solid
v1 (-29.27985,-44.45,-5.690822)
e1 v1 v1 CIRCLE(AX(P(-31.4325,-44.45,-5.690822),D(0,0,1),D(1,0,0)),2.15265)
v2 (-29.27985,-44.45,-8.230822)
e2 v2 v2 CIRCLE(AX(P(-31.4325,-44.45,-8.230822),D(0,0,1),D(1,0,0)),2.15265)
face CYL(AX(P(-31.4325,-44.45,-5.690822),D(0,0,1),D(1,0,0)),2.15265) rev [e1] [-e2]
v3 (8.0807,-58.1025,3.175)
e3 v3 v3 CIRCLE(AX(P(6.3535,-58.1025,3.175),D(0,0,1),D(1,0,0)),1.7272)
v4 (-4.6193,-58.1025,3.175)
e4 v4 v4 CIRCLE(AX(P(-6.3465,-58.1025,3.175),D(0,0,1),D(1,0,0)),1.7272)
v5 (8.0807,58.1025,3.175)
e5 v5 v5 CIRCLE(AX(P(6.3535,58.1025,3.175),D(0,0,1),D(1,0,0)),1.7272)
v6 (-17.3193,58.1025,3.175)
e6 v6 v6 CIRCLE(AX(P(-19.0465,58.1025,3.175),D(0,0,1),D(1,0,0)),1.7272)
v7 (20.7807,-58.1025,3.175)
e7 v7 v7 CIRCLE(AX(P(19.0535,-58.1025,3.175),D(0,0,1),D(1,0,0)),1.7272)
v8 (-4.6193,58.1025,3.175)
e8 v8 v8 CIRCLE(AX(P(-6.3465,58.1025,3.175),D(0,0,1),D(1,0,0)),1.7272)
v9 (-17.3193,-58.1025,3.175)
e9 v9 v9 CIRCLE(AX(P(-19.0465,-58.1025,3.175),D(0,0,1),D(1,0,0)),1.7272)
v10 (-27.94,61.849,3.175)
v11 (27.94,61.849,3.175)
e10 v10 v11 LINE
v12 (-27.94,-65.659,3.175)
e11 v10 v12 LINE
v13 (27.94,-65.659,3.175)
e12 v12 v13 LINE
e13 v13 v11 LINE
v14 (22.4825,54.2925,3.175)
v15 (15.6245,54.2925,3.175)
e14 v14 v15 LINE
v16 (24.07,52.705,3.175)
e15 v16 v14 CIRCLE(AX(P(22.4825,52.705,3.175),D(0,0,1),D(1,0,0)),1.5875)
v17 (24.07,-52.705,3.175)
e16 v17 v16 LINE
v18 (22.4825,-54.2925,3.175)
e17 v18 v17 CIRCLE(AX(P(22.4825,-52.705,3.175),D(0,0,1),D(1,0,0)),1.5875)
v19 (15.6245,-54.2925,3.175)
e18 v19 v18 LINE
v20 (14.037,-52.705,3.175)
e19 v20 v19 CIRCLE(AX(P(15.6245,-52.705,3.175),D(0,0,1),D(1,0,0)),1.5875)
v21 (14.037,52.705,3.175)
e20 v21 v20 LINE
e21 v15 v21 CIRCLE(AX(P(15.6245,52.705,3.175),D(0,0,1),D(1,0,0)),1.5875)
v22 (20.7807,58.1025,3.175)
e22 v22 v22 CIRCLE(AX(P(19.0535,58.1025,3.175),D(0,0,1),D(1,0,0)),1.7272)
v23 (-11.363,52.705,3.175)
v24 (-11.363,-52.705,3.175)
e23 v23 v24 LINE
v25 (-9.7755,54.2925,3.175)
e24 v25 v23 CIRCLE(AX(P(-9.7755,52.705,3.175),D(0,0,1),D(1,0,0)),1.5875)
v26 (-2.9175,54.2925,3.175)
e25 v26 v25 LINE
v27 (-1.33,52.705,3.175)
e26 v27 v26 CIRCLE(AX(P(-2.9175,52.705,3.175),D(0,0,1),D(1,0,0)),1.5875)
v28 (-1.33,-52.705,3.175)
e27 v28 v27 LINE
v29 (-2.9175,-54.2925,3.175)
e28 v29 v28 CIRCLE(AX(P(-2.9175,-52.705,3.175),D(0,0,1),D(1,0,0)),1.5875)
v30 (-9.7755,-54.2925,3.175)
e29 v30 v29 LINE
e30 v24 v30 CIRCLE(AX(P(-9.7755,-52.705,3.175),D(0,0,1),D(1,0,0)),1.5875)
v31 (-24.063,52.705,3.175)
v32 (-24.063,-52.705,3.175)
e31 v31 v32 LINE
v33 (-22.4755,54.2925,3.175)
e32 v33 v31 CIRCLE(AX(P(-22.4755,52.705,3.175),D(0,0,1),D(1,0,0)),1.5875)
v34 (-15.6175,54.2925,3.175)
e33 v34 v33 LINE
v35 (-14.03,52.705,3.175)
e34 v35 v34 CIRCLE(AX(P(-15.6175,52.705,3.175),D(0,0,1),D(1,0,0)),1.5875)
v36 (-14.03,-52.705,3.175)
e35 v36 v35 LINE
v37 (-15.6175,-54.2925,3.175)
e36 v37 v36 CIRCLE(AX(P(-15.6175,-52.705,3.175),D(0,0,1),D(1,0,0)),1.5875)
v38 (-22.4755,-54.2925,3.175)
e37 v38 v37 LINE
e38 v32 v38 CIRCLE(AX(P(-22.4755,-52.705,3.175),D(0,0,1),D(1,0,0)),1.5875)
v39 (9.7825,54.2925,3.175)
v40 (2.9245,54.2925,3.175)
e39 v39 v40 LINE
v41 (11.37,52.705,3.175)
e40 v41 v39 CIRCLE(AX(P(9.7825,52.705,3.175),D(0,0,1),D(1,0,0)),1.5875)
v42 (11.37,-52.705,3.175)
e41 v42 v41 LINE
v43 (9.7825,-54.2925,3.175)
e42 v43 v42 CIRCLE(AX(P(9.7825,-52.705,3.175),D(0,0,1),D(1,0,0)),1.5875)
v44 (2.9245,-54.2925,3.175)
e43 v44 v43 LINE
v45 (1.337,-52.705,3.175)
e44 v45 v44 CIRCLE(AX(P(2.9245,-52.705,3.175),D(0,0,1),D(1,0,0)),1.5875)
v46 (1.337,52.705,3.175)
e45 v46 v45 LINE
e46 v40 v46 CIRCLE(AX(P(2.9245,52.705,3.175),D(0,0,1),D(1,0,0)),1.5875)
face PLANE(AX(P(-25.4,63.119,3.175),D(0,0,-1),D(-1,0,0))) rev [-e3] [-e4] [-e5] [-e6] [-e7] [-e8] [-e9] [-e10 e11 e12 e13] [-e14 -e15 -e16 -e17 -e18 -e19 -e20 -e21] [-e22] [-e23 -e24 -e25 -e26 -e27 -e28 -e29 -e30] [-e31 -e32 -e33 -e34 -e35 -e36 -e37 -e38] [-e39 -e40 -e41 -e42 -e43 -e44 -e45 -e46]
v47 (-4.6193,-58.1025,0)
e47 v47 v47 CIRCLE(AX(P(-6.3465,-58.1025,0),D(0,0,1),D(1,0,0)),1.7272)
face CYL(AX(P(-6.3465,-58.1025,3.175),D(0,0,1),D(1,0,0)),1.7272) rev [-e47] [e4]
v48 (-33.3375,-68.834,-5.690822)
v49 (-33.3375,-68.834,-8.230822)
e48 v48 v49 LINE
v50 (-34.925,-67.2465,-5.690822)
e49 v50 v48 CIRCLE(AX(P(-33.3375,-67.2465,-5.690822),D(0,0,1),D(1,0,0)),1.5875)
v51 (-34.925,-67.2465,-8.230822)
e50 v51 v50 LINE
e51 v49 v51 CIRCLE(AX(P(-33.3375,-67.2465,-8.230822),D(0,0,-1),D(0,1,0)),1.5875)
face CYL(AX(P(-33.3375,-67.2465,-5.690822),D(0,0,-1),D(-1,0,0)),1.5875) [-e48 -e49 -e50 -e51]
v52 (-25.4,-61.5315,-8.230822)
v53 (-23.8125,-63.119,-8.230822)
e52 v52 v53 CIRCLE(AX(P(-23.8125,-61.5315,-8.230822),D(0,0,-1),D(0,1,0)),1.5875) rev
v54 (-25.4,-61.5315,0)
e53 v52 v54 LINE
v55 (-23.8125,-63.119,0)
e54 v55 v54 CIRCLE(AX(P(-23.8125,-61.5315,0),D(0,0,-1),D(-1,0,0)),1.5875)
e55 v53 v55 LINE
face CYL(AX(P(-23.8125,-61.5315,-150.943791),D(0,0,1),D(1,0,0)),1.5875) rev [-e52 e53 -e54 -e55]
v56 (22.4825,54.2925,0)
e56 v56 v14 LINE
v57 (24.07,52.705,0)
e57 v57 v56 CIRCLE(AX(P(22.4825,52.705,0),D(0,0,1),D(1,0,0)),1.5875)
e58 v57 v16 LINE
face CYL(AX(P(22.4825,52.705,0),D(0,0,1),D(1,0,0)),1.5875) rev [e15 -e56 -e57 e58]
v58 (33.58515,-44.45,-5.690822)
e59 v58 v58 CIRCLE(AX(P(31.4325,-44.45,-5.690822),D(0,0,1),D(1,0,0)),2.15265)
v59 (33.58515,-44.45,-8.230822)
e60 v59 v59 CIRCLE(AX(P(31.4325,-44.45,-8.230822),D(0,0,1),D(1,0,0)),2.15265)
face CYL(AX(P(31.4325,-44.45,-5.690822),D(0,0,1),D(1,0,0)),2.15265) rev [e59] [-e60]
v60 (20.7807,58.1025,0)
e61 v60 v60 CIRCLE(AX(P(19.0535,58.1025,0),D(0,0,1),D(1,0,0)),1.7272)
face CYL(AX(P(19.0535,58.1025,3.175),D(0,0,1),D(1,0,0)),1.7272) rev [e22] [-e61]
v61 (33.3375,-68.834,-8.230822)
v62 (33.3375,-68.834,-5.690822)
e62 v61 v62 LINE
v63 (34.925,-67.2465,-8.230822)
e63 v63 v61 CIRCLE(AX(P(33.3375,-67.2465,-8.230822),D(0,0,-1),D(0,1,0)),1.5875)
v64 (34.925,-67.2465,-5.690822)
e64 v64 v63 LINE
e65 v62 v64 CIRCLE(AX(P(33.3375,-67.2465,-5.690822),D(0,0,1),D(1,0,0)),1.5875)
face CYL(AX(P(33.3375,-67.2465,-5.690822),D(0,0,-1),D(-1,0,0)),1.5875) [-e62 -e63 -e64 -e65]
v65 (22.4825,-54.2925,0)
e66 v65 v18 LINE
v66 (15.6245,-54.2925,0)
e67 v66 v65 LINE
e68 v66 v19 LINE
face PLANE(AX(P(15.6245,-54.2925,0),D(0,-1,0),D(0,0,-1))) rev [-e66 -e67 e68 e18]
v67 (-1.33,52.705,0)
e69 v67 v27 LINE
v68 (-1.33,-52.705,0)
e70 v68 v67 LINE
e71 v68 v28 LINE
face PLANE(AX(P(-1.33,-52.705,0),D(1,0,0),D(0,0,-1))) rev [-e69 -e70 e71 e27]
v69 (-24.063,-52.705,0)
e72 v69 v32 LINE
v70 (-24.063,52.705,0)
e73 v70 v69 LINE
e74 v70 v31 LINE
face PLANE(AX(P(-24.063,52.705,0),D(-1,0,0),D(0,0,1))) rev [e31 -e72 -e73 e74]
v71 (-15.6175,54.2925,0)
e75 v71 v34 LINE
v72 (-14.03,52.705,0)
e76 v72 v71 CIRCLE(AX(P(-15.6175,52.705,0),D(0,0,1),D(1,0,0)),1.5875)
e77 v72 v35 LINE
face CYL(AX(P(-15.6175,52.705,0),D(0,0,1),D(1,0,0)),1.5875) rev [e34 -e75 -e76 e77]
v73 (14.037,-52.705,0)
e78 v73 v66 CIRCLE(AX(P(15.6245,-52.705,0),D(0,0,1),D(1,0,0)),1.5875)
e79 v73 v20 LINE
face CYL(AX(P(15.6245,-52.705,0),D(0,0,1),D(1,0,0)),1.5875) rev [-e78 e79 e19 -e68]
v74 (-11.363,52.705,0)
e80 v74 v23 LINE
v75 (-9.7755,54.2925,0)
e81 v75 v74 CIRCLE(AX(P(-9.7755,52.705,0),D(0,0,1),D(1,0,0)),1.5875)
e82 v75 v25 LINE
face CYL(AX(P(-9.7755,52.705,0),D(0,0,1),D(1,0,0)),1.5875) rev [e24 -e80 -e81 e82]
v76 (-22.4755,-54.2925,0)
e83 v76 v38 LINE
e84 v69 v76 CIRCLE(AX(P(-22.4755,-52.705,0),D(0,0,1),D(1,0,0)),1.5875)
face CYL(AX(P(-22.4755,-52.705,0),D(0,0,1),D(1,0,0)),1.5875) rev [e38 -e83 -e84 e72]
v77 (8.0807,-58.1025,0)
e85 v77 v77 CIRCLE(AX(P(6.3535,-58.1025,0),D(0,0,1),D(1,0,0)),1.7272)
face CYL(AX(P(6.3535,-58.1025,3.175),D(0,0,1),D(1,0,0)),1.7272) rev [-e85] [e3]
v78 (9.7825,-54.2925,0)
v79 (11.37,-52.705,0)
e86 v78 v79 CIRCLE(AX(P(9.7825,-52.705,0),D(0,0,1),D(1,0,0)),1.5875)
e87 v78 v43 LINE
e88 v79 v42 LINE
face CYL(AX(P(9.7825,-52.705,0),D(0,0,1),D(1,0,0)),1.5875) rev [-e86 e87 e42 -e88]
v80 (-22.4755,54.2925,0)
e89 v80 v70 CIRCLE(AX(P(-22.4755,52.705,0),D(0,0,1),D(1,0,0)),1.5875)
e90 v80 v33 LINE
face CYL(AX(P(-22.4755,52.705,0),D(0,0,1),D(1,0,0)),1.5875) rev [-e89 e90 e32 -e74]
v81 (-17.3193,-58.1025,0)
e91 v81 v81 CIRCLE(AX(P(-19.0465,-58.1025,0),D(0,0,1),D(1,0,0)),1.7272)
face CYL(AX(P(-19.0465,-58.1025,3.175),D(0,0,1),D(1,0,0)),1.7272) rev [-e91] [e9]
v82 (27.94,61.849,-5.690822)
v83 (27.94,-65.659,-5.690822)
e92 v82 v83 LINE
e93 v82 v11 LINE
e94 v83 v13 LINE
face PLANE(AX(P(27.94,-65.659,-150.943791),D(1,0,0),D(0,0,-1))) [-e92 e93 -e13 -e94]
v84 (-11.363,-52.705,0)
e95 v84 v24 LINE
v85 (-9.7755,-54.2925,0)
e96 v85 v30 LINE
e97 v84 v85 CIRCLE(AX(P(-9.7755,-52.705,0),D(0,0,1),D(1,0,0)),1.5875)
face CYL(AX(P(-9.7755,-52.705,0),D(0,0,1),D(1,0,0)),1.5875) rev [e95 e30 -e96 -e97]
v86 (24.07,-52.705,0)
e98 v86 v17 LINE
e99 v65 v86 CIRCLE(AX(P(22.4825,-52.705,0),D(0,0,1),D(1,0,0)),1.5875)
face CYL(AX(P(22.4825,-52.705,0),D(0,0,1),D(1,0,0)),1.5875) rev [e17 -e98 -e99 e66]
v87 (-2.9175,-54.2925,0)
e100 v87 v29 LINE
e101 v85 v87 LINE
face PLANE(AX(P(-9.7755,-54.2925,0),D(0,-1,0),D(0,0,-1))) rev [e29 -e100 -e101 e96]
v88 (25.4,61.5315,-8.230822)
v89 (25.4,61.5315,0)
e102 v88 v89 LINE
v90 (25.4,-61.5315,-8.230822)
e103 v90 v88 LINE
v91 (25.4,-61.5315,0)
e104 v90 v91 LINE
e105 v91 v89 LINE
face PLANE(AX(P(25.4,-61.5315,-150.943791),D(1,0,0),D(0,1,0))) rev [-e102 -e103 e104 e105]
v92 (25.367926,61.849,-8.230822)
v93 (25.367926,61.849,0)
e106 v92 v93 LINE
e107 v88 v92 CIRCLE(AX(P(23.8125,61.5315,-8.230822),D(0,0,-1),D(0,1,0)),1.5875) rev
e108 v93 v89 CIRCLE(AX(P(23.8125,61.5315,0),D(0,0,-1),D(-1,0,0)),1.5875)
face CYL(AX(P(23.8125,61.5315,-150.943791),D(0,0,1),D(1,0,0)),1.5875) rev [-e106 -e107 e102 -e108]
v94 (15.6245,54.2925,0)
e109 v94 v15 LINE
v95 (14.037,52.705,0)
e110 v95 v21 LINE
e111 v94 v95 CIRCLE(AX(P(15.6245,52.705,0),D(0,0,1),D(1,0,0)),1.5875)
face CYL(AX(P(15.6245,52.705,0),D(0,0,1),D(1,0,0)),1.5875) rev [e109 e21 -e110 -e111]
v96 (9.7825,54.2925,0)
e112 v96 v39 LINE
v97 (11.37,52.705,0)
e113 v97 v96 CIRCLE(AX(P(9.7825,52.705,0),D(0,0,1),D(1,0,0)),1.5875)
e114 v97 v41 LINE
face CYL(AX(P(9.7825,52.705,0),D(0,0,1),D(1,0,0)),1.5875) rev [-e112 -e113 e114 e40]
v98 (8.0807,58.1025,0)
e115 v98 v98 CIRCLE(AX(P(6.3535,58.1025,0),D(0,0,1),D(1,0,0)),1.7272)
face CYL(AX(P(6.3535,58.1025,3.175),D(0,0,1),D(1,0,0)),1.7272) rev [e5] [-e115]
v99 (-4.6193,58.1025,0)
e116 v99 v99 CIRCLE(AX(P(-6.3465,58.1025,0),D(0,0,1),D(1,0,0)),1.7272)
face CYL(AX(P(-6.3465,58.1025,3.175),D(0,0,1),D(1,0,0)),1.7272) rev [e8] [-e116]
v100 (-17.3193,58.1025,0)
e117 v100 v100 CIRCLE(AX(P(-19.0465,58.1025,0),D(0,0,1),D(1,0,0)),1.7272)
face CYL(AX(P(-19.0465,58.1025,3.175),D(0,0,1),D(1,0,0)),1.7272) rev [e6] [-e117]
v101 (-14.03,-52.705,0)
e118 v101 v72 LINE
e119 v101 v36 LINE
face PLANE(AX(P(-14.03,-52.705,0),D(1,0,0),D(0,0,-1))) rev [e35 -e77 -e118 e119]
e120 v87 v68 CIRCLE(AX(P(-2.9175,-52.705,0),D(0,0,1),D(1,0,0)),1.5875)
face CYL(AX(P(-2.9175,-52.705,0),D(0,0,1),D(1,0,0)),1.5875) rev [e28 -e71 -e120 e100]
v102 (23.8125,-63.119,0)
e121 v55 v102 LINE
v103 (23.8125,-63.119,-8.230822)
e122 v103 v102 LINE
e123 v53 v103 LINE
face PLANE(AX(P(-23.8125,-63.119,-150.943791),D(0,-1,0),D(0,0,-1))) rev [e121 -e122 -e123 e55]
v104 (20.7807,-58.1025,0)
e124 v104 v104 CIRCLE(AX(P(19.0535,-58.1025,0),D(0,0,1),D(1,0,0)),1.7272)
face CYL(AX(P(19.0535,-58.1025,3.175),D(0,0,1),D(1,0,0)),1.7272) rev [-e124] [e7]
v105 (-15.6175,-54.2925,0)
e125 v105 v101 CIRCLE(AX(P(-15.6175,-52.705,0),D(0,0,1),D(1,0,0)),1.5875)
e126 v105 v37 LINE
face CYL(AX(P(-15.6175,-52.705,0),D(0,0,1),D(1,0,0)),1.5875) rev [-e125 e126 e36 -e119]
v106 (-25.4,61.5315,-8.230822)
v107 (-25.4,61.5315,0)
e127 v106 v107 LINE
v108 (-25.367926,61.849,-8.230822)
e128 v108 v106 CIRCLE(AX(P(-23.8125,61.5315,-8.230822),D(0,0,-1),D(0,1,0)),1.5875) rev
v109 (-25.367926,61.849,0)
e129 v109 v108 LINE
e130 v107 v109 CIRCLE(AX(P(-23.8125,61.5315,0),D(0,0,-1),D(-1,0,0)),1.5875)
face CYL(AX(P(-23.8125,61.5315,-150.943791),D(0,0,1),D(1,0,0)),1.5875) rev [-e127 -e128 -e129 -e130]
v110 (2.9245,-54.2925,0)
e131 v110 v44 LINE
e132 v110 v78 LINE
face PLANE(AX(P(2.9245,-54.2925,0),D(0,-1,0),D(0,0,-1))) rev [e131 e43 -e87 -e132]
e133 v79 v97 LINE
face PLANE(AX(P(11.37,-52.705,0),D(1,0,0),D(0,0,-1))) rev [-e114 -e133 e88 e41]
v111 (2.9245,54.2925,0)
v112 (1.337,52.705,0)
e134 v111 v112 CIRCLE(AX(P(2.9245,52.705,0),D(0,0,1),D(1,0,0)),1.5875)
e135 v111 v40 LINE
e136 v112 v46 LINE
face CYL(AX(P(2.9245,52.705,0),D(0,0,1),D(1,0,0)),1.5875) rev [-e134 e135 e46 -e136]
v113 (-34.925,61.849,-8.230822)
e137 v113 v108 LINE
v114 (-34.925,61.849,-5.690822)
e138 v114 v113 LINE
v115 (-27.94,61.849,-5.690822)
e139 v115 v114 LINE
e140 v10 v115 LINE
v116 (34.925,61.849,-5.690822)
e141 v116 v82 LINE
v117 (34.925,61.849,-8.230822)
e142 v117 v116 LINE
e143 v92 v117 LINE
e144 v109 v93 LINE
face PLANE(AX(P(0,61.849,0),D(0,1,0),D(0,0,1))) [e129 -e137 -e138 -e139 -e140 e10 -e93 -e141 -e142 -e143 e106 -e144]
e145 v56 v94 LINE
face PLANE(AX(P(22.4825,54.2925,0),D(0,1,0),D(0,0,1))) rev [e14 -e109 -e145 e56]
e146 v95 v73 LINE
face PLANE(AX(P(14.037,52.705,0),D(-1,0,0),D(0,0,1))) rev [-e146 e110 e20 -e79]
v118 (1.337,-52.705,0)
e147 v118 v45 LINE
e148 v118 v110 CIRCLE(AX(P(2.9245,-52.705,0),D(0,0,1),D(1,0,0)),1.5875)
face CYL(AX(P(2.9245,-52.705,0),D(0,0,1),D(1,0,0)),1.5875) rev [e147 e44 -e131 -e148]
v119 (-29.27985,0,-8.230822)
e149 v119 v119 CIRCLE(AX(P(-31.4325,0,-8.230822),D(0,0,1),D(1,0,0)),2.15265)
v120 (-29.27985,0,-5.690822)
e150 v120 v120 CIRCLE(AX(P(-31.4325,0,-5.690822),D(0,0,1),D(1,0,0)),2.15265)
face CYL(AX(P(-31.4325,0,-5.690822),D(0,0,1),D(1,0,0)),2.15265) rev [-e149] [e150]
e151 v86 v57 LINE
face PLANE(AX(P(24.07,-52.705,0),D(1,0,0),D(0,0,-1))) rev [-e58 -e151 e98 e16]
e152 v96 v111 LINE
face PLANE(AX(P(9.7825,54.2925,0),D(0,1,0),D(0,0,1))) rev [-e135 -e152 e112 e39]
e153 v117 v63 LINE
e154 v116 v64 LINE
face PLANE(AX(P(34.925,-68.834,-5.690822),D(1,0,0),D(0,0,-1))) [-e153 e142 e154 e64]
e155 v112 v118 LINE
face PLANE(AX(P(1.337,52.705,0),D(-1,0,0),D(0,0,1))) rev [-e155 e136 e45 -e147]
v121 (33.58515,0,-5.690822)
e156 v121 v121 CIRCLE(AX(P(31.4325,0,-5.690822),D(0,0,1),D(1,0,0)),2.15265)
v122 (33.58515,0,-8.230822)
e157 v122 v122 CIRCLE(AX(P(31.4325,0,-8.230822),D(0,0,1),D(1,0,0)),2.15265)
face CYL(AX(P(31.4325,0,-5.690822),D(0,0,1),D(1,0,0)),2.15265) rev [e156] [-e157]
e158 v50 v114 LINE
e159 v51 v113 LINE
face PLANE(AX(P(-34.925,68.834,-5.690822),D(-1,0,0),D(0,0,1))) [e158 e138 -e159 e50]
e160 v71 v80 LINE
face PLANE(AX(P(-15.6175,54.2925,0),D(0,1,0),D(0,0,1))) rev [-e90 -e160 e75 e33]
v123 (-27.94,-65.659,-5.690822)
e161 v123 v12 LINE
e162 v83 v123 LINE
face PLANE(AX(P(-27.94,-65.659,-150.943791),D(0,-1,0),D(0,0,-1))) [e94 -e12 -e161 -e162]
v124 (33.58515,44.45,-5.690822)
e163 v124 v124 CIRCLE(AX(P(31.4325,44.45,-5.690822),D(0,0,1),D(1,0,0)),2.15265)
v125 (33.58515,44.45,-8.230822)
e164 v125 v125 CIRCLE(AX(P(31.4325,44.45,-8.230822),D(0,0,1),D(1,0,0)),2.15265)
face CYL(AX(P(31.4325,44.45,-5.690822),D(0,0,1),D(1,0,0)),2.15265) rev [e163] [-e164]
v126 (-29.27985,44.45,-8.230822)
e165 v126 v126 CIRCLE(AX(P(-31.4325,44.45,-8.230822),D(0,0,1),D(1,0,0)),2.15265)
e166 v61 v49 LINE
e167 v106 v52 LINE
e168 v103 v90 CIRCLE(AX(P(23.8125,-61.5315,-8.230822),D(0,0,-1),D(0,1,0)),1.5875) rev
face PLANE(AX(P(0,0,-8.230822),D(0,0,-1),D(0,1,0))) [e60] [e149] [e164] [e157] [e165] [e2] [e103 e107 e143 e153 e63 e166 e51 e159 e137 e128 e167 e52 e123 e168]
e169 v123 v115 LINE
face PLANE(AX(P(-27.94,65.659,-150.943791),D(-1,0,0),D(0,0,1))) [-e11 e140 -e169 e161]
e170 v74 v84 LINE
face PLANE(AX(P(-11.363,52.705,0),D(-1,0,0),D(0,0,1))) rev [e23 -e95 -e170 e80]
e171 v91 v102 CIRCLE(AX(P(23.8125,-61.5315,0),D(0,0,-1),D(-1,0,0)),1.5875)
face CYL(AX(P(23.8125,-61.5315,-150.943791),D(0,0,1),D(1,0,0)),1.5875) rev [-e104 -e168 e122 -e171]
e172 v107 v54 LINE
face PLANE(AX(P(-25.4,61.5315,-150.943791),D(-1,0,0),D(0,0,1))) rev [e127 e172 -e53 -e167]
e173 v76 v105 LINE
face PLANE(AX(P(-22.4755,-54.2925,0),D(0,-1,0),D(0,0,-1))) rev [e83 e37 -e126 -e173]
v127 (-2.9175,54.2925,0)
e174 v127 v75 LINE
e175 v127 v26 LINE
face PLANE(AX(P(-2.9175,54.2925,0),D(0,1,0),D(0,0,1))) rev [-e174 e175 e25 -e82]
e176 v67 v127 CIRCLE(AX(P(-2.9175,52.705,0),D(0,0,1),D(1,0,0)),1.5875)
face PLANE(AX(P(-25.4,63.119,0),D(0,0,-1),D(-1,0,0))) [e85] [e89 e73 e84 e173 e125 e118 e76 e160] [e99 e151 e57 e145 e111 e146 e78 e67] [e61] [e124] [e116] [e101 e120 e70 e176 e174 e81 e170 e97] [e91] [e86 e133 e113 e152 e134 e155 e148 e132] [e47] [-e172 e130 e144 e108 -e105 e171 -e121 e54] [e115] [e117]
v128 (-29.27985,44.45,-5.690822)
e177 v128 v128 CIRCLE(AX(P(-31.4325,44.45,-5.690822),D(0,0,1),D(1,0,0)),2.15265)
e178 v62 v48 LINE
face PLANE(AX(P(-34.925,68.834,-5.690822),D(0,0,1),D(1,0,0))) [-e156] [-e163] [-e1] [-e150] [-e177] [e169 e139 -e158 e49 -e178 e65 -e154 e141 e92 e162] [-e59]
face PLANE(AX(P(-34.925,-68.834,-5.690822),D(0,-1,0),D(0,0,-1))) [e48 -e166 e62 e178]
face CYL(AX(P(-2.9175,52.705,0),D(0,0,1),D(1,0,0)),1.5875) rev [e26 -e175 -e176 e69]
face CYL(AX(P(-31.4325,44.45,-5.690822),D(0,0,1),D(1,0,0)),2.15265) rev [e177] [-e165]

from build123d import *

# Parameters (mm, degrees)
SKETCH1_W                 = 50.8
SKETCH1_H                 = 126.238
BACK_DEPTH                = 3.175
CUT_EXTRUDE3_DEPTH        = 69.11203114
F_4_CLEARANCE_HOLE1_D     = 3.4544
LPATTERN1_OUTLINE_R       = 1.7272
LPATTERN1_DEPTH           = 3.175
SKETCH9_W                 = 55.88
SKETCH9_H                 = 131.318
WALLS_DEPTH               = 11.405821857
SKETCH11_W                = 69.85
SKETCH11_H                = 137.668
SKETCH11_W_2              = 50.8
SKETCH11_H_2              = 126.238
LIP_DEPTH                 = 2.54
F_6_CLEARANCE_OVERSIZED_D = 4.3053
FILLET2_R                 = 1.5875
CUT_EXTRUDE4_DEPTH        = 6.858
CUT_EXTRUDE4_DEPTH_BACK   = 3.81
SKETCH19_W                = 76.814856898
SKETCH19_H                = 21.095936882


# Read off the part's stored shape, not the designer's step: LPattern1
with BuildPart() as part:
    # Sketch1 → back (new body)
    with BuildSketch(Plane.XY):
        Rectangle(SKETCH1_W, SKETCH1_H)
    extrude(amount=BACK_DEPTH)

    # Sketch6 → Cut-Extrude3 (cut, through all)
    with BuildSketch(Plane.XY.offset(3.175)):
        with BuildLine():
            Line((24.07, -52.705), (24.07, 52.705))
            ThreePointArc((24.07, 52.705), (23.605032015, 53.827532015), (22.4825, 54.2925))
            Line((22.4825, 54.2925), (15.6245, 54.2925))
            ThreePointArc((15.6245, 54.2925), (14.501967985, 53.827532015), (14.037, 52.705))
            Line((14.037, 52.705), (14.037, -52.705))
            ThreePointArc((14.037, -52.705), (14.501967985, -53.827532015), (15.6245, -54.2925))
            Line((15.6245, -54.2925), (22.4825, -54.2925))
            ThreePointArc((22.4825, -54.2925), (23.605032015, -53.827532015), (24.07, -52.705))
        make_face()
    extrude(amount=-CUT_EXTRUDE3_DEPTH, mode=Mode.SUBTRACT)

    # #4 Clearance Hole1 (through all)
    with Locations(Plane(origin=(19.0535, 58.1025, 3.175), x_dir=(1, 0, 0), z_dir=(0, 0, 1))):
        with Locations((0, 0), (0, -116.205)):
            Hole(F_4_CLEARANCE_HOLE1_D / 2)

    # LPattern1 outline → LPattern1 (cut)
    with BuildSketch(Plane.XY):
        with BuildLine():
            ThreePointArc((1.337, -52.705), (1.801967985, -53.827532015), (2.9245, -54.2925))
            Line((2.9245, -54.2925), (9.7825, -54.2925))
            ThreePointArc((9.7825, -54.2925), (10.905032015, -53.827532015), (11.37, -52.705))
            Line((11.37, -52.705), (11.37, 52.705))
            ThreePointArc((11.37, 52.705), (10.905032015, 53.827532015), (9.7825, 54.2925))
            Line((9.7825, 54.2925), (2.9245, 54.2925))
            ThreePointArc((2.9245, 54.2925), (1.801967985, 53.827532015), (1.337, 52.705))
            Line((1.337, 52.705), (1.337, -52.705))
        make_face()
        with BuildLine():
            ThreePointArc((-11.363, -52.705), (-10.898032015, -53.827532015), (-9.7755, -54.2925))
            Line((-9.7755, -54.2925), (-2.9175, -54.2925))
            ThreePointArc((-2.9175, -54.2925), (-1.794967985, -53.827532015), (-1.33, -52.705))
            Line((-1.33, -52.705), (-1.33, 52.705))
            ThreePointArc((-1.33, 52.705), (-1.794967985, 53.827532015), (-2.9175, 54.2925))
            Line((-2.9175, 54.2925), (-9.7755, 54.2925))
            ThreePointArc((-9.7755, 54.2925), (-10.898032015, 53.827532015), (-11.363, 52.705))
            Line((-11.363, 52.705), (-11.363, -52.705))
        make_face()
        with BuildLine():
            ThreePointArc((-24.063, -52.705), (-23.598032015, -53.827532015), (-22.4755, -54.2925))
            Line((-22.4755, -54.2925), (-15.6175, -54.2925))
            ThreePointArc((-15.6175, -54.2925), (-14.494967985, -53.827532015), (-14.03, -52.705))
            Line((-14.03, -52.705), (-14.03, 52.705))
            ThreePointArc((-14.03, 52.705), (-14.494967985, 53.827532015), (-15.6175, 54.2925))
            Line((-15.6175, 54.2925), (-22.4755, 54.2925))
            ThreePointArc((-22.4755, 54.2925), (-23.598032015, 53.827532015), (-24.063, 52.705))
            Line((-24.063, 52.705), (-24.063, -52.705))
        make_face()
        with Locations((6.3535, -58.1025)):
            Circle(LPATTERN1_OUTLINE_R)
        with Locations((-6.3465, -58.1025)):
            Circle(LPATTERN1_OUTLINE_R)
        with Locations((-19.0465, -58.1025)):
            Circle(LPATTERN1_OUTLINE_R)
        with Locations((6.3535, 58.1025)):
            Circle(LPATTERN1_OUTLINE_R)
        with Locations((-6.3465, 58.1025)):
            Circle(LPATTERN1_OUTLINE_R)
        with Locations((-19.0465, 58.1025)):
            Circle(LPATTERN1_OUTLINE_R)
    extrude(amount=LPATTERN1_DEPTH, mode=Mode.SUBTRACT)

    # Sketch9 → walls (add)
    with BuildSketch(Plane.XY.offset(3.175)):
        Rectangle(SKETCH9_W, SKETCH9_H)
        with BuildLine():
            Line((25.4, -61.5315), (25.4, 61.5315))
            ThreePointArc((25.4, 61.5315), (24.935032015, 62.654032015), (23.8125, 63.119))
            Line((23.8125, 63.119), (-23.8125, 63.119))
            ThreePointArc((-23.8125, 63.119), (-24.935032015, 62.654032015), (-25.4, 61.5315))
            Line((-25.4, 61.5315), (-25.4, -61.5315))
            ThreePointArc((-25.4, -61.5315), (-24.935032015, -62.654032015), (-23.8125, -63.119))
            Line((-23.8125, -63.119), (23.8125, -63.119))
            ThreePointArc((23.8125, -63.119), (24.935032015, -62.654032015), (25.4, -61.5315))
        make_face(mode=Mode.SUBTRACT)
    extrude(amount=-WALLS_DEPTH)

    # Sketch11 → lip (add)
    with BuildSketch(Plane(origin=(0, 0, -8.230821857), x_dir=(-1, 0, 0), z_dir=(0, 0, -1))):
        Rectangle(SKETCH11_W, SKETCH11_H)
        Rectangle(SKETCH11_W_2, SKETCH11_H_2, mode=Mode.SUBTRACT)
    extrude(amount=-LIP_DEPTH)

    # #6 Clearance OVERSIZED (through all)
    with Locations(Plane(origin=(-31.4325, 44.45, -5.690821857), x_dir=(1, 0, 0), z_dir=(0, 0, 1))):
        with Locations((0, 0), (0, -44.45), (0, -88.9)):
            f_6_clearance_oversized = Hole(F_6_CLEARANCE_OVERSIZED_D / 2)

    # Fillet2
    fillet2_edges = [part.edges().sort_by_distance(p)[0] for p in [
        (34.925, 68.834, -6.960821857),
        (-34.925, 68.834, -6.960821857),
        (-34.925, -68.834, -6.960821857),
        (34.925, -68.834, -6.960821857),
    ]]
    fillet(fillet2_edges, radius=FILLET2_R)

    # Mirror2: #6 Clearance OVERSIZED across plane
    add(f_6_clearance_oversized.mirror(Plane(origin=(0, 0, 0), x_dir=(0, 0, 1), z_dir=(1, 0, 0))), mode=Mode.SUBTRACT)

    # Sketch19 → Cut-Extrude4 (cut, two sides: drawn at the far end of the back side and taken through both)
    with BuildSketch(Plane(origin=(0, 65.659, 0), x_dir=(1, 0, 0), z_dir=(0, 1, 0)).offset(-CUT_EXTRUDE4_DEPTH_BACK)):
        Rectangle(SKETCH19_W, SKETCH19_H)
    extrude(amount=CUT_EXTRUDE4_DEPTH + CUT_EXTRUDE4_DEPTH_BACK, mode=Mode.SUBTRACT)


solid = part.part
